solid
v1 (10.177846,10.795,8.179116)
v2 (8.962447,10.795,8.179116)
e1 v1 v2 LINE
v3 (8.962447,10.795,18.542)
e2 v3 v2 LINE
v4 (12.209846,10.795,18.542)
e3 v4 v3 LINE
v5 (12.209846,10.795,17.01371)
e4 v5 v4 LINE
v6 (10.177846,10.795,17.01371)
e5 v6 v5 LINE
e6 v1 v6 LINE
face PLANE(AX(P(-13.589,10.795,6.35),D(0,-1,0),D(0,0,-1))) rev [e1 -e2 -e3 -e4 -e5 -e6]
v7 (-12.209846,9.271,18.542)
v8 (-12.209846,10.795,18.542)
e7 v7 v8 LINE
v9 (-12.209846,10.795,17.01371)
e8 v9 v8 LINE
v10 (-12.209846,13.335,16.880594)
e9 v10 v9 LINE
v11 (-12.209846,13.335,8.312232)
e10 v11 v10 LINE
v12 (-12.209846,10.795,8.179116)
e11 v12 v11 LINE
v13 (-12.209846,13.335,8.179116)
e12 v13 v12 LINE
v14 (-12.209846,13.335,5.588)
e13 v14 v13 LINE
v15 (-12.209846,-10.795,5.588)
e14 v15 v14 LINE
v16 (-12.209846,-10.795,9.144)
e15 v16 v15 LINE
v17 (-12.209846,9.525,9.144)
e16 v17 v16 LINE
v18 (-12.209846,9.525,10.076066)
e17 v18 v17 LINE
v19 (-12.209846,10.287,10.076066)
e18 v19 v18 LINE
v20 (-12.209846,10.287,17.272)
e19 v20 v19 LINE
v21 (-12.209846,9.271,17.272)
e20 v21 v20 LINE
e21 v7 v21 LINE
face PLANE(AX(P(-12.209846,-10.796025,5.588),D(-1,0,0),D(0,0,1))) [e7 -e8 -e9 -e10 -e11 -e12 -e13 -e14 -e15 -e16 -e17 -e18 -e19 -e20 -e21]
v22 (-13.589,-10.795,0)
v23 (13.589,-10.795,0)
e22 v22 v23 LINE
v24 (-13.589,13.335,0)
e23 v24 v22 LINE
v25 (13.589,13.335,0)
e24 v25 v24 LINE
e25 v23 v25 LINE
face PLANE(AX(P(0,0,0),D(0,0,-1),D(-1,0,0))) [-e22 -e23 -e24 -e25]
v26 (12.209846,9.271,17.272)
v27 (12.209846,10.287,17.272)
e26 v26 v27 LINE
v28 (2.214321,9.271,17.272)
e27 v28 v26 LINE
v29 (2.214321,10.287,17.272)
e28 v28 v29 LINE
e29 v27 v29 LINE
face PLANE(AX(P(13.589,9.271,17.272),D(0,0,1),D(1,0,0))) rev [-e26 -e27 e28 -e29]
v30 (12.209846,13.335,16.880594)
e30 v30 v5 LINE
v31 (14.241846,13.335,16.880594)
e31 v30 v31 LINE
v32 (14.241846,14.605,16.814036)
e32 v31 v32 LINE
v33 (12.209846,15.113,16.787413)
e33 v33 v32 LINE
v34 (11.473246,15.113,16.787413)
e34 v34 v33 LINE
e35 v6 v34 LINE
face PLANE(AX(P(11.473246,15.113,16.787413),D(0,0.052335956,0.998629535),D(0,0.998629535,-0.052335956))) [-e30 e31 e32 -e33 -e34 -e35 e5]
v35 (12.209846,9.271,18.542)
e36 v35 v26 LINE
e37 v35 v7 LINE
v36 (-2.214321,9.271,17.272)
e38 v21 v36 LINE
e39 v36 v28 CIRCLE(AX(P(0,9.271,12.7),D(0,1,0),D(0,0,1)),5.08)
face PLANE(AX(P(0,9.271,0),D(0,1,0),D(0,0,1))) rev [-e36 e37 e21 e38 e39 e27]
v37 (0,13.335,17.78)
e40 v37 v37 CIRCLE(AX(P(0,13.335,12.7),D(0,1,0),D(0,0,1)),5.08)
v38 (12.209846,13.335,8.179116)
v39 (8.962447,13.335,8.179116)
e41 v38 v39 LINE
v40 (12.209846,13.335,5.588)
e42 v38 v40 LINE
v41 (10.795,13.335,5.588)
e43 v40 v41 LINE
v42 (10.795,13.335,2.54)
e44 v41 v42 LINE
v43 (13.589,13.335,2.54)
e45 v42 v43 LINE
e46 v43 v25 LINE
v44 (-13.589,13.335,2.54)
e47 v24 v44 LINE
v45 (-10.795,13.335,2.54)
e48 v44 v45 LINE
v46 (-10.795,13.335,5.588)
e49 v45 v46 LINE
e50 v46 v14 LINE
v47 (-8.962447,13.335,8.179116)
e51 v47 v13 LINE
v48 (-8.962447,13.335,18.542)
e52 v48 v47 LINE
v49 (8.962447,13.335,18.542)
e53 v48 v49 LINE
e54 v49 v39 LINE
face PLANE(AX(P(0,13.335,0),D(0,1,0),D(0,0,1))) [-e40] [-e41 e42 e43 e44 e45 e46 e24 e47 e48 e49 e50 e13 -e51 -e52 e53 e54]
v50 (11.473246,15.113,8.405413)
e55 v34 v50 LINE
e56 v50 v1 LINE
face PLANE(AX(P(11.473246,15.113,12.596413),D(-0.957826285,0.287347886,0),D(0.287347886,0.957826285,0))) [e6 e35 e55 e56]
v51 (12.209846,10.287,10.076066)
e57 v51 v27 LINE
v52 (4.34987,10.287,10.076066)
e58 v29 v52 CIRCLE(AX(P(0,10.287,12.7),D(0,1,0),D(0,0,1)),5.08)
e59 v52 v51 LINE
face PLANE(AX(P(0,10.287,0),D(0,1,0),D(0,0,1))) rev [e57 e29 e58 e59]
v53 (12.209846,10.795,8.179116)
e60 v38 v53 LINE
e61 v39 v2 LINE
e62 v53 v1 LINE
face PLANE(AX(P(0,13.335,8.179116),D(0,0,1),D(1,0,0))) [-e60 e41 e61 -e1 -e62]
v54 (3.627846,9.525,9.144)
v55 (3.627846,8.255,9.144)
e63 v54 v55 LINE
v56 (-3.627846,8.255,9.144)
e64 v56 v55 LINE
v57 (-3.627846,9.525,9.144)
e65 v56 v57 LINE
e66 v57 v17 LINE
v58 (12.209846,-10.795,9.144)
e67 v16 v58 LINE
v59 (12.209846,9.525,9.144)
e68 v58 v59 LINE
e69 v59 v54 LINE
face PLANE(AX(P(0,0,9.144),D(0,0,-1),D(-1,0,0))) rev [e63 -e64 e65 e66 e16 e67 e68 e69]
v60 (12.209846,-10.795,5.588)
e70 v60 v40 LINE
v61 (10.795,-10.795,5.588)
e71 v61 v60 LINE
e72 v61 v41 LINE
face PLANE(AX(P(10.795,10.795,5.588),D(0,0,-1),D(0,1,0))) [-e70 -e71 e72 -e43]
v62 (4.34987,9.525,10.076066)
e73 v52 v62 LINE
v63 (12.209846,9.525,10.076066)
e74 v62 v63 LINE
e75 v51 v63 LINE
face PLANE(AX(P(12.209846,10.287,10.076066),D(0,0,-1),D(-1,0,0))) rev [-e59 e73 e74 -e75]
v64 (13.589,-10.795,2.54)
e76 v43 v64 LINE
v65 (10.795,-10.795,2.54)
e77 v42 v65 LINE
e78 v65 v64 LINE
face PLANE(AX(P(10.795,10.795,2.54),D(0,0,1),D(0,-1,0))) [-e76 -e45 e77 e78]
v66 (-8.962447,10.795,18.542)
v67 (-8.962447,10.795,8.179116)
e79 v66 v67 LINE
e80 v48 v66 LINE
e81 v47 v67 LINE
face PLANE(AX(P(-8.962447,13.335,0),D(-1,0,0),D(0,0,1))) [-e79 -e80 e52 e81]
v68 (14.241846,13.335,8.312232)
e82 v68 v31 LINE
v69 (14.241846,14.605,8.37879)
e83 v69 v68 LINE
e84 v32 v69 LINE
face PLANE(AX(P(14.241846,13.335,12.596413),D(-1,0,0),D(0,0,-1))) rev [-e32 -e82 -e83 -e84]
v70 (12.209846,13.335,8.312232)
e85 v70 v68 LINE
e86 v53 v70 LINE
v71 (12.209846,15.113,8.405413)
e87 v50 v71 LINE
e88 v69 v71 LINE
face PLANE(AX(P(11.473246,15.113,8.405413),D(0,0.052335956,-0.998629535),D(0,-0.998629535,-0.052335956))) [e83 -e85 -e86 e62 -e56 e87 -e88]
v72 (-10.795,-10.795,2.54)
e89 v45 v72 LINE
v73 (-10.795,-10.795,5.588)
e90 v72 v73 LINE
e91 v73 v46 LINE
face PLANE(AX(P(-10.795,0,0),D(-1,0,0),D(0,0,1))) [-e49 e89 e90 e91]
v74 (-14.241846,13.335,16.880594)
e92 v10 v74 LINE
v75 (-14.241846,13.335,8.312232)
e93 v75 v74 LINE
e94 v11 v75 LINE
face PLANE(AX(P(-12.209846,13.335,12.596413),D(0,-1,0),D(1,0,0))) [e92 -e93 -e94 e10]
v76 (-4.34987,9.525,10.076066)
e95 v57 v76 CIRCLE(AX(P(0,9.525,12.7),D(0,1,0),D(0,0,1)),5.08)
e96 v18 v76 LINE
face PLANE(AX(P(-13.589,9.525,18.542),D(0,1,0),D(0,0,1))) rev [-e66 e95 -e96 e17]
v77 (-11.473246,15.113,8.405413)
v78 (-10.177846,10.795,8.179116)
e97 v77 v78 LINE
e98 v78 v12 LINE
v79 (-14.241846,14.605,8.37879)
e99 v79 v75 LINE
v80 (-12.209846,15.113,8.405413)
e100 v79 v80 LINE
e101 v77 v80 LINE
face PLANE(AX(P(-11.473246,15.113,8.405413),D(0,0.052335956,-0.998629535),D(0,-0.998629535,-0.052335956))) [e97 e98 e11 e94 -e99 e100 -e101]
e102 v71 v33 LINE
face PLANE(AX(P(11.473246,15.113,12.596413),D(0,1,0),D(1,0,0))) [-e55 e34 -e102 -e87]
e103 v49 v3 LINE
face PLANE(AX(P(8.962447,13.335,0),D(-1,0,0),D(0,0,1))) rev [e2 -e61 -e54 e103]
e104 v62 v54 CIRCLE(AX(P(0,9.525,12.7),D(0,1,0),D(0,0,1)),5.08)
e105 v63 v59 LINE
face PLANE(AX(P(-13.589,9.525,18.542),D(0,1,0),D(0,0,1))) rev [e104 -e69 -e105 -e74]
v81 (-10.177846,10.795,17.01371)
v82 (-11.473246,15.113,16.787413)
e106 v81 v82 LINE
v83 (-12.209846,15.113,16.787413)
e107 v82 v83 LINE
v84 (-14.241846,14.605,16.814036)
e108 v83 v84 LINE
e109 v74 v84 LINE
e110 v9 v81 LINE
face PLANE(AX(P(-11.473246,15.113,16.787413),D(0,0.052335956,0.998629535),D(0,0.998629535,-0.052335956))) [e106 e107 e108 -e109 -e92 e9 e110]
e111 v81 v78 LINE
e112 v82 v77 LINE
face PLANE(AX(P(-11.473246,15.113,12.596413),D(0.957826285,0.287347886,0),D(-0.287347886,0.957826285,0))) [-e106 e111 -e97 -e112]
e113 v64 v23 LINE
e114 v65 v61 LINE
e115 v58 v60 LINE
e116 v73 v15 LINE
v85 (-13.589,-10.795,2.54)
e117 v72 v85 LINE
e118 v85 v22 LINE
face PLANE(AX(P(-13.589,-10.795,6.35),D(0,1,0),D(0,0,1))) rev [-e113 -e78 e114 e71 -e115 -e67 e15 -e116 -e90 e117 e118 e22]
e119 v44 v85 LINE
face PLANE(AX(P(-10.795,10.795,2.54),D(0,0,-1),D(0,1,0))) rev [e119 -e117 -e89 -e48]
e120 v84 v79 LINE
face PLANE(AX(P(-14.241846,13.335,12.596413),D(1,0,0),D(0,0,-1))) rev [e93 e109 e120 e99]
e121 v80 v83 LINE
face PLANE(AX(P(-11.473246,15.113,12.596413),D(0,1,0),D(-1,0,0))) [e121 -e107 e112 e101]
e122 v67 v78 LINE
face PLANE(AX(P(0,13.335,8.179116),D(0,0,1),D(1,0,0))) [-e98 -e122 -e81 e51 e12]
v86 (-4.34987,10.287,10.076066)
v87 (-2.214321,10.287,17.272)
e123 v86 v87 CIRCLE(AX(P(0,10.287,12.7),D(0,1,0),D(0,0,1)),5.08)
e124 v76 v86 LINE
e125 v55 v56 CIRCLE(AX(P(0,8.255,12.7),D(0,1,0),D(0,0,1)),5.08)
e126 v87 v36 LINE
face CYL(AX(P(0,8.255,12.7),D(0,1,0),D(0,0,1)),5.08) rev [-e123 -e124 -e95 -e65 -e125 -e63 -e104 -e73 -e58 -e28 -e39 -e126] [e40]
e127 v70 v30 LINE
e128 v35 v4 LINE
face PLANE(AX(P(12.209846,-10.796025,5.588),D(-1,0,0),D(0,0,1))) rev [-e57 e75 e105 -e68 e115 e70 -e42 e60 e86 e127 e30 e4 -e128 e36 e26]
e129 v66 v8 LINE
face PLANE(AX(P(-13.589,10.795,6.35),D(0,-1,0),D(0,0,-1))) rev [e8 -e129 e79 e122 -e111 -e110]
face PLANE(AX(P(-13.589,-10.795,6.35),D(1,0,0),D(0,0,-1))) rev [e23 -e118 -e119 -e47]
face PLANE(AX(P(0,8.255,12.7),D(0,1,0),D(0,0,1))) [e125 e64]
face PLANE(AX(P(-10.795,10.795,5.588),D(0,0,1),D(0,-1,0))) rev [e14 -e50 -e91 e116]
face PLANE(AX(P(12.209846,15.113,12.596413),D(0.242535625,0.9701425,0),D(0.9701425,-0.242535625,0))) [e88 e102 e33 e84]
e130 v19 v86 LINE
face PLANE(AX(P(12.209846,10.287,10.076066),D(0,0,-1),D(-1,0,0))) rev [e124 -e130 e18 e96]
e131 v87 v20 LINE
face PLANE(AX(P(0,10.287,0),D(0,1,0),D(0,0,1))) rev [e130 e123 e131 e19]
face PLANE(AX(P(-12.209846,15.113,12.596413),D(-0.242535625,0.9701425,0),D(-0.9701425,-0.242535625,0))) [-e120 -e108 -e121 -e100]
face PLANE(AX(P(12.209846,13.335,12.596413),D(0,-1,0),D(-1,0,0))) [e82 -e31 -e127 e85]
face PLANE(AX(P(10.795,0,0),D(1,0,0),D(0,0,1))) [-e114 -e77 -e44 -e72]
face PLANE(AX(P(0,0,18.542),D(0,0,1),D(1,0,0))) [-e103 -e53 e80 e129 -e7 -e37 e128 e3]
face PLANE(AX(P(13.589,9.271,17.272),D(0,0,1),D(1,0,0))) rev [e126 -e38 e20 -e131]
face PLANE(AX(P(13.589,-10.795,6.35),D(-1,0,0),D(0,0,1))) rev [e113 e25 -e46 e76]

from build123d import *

# Parameters (mm, degrees)
SKETCH2_W                       = 27.178
SKETCH2_H                       = 21.59
INITIAL_EXTRUDE_DEPTH           = 6.35
SKETCH3_W                       = 27.178
SKETCH3_H                       = 1.27
INTIAL_EXTRUDE_HORIZONTAL_DEPTH = 12.192
SKETCH4_W                       = 27.178
SKETCH4_H                       = 1.27
SLIGHT_EXTRUDE_VERTICAL_DEPTH   = 0.254
SKETCH5_W                       = 3.048
SKETCH5_H                       = 21.59
CUT_EXTRUDE1_DEPTH              = 2.794
CUT_EXTRUDE2_REACH              = 33.537
SKETCH6_W                       = 1.379153921
SKETCH6_H                       = 12.954
SNAP_START                      = 11.473246079
SNAP_HOOK2_DEPTH                = 0.7366
SNAP_START_2                    = 8.31223189
SNAP_HOOK2_2_DEPTH              = 8.568362063
SNAP_START_3                    = 8.179116131
SNAP_HOOK2_3_DEPTH              = 8.834593581
SNAP_START_4                    = 9
SNAP_HOOK2_4_DEPTH              = 6
BOSS_EXTRUDE1_DEPTH             = 2.54
SKETCH8_W                       = 24.419692158
SKETCH8_H                       = 7.195933706
CUT_EXTRUDE3_DEPTH              = 0.762
SKETCH9_W                       = 24.419692158
SKETCH9_H                       = 20.32
BOSS_EXTRUDE2_DEPTH             = 2.794
SKETCH10_R                      = 5.08
CUT_EXTRUDE4_DEPTH              = 5.08


with BuildPart() as part:
    # Sketch2 → Initial Extrude (new body)
    with BuildSketch(Plane.XY):
        Rectangle(SKETCH2_W, SKETCH2_H)
    extrude(amount=INITIAL_EXTRUDE_DEPTH)

    # Sketch3 → Intial Extrude horizontal (add)
    with BuildSketch(Plane.XY.offset(6.35)):
        with Locations((0, 10.16)):
            Rectangle(SKETCH3_W, SKETCH3_H)
    extrude(amount=INTIAL_EXTRUDE_HORIZONTAL_DEPTH)

    # Sketch4 → Slight Extrude vertical (add)
    with BuildSketch(Plane.XZ.offset(-9.525)):
        with Locations((0, 17.907)):
            Rectangle(SKETCH4_W, SKETCH4_H)
    extrude(amount=SLIGHT_EXTRUDE_VERTICAL_DEPTH)

    # Sketch5 → Cut-Extrude1 (cut)
    with BuildSketch(Plane.ZY.offset(13.589)):
        with Locations((4.064, 0)):
            Rectangle(SKETCH5_W, SKETCH5_H)
    cut_extrude1 = extrude(amount=-CUT_EXTRUDE1_DEPTH, mode=Mode.SUBTRACT)

    # Mirror3: Cut-Extrude1 across plane
    add(cut_extrude1.mirror(Plane(origin=(0, 0, 0), x_dir=(0, 0, 1), z_dir=(1, 0, 0))), mode=Mode.SUBTRACT)

    # Sketch6 → Cut-Extrude2 (cut, up to next)
    with BuildSketch(Plane(origin=(0, 10.795, 0), x_dir=(1, 0, 0), z_dir=(0, 1, 0)), mode=Mode.PRIVATE) as cut_extrude2_sk1:
        with Locations((12.89942304, -12.065)):
            Rectangle(SKETCH6_W, SKETCH6_H)
    cut_extrude2_tool1 = extrude(cut_extrude2_sk1.sketch, amount=-CUT_EXTRUDE2_REACH, mode=Mode.PRIVATE) & part.part
    cut_extrude2 = cut_extrude2_tool1.solids().sort_by_distance((12.899423, 10.795, 12.065))[0]
    add(cut_extrude2, mode=Mode.SUBTRACT)

    # Mirror7: Cut-Extrude2 across plane
    add(cut_extrude2.mirror(Plane(origin=(0, 0, 0), x_dir=(0, 0, 1), z_dir=(1, 0, 0))), mode=Mode.SUBTRACT)

    # Snap Hook2: read off the stored shape, not the designer's step
    # Snap Hook2 outline → Snap Hook2 (add)
    with BuildSketch(Plane.YZ.offset(SNAP_START)):
        Polygon((10.795, 17.013709712), (10.795, 8.179116131), (15.113, 8.405412922), (15.113, 16.787412922), align=None)
    snap_hook2 = extrude(amount=SNAP_HOOK2_DEPTH)

    # Snap Hook2 2 outline → Snap Hook2 2 (add)
    with BuildSketch(Plane.XY.offset(SNAP_START_2)):
        Polygon((11.473246079, 10.795), (11.473246079, 15.113), (10.177846079, 10.795), align=None)
        Polygon((12.209846079, 15.113), (12.209846079, 13.335), (14.241846079, 13.335), (14.241846079, 14.605), align=None)
    snap_hook2_2 = extrude(amount=SNAP_HOOK2_2_DEPTH)

    # Snap Hook2 3 outline → Snap Hook2 3 (add)
    with BuildSketch(Plane.XY.offset(SNAP_START_3)):
        Polygon((11.473246079, 10.795), (11.473246079, 15.113), (10.177846079, 10.795), align=None)
    snap_hook2_3 = extrude(amount=SNAP_HOOK2_3_DEPTH)

    # Snap Hook2 4 outline → Snap Hook2 4 (cut)
    with BuildSketch(Plane.YZ.offset(SNAP_START_4)):
        Polygon((10.795, 8.179116131), (17, 8.179116131), (17, 8.504306402), (15.113, 8.405412922), align=None)
        Polygon((15.113, 16.787412922), (17, 16.688519443), (17, 17.013709712), (10.795, 17.013709712), align=None)
    snap_hook2_4 = extrude(amount=SNAP_HOOK2_4_DEPTH, mode=Mode.SUBTRACT)

    # Mirror6: Snap Hook2, Snap Hook2 2, Snap Hook2 3, Snap Hook2 4 across plane
    add(snap_hook2.mirror(Plane(origin=(0, 0, 0), x_dir=(0, 0, 1), z_dir=(1, 0, 0))))
    add(snap_hook2_2.mirror(Plane(origin=(0, 0, 0), x_dir=(0, 0, 1), z_dir=(1, 0, 0))))
    add(snap_hook2_3.mirror(Plane(origin=(0, 0, 0), x_dir=(0, 0, 1), z_dir=(1, 0, 0))))
    add(snap_hook2_4.mirror(Plane(origin=(0, 0, 0), x_dir=(0, 0, 1), z_dir=(1, 0, 0))), mode=Mode.SUBTRACT)

    # Sketch7 → Boss-Extrude1 (add)
    with BuildSketch(Plane(origin=(0, 10.795, 0), x_dir=(1, 0, 0), z_dir=(0, 1, 0))):
        Polygon((-8.962447439, -8.179116131), (-8.962447439, -18.542), (8.962447439, -18.542), (8.962447439, -8.179116131), (9, -8.179116131), (10.177846079, -8.179116131), (12.209846079, -8.179116131), (12.209846079, -5.588), (10.795, -5.588), (10.795, -2.54), (13.589, -2.54), (13.589, 0), (-13.589, 0), (-13.589, -2.54), (-10.795, -2.54), (-10.795, -5.588), (-12.209846079, -5.588), (-12.209846079, -8.179116131), (-10.177846079, -8.179116131), (-9, -8.179116131), align=None)
    extrude(amount=BOSS_EXTRUDE1_DEPTH)

    # Sketch8 → Cut-Extrude3 (cut)
    with BuildSketch(Plane.XZ.offset(-9.525)):
        with Locations((0, 13.674033147)):
            Rectangle(SKETCH8_W, SKETCH8_H)
    extrude(amount=-CUT_EXTRUDE3_DEPTH, mode=Mode.SUBTRACT)

    # Sketch9 → Boss-Extrude2 (add)
    with BuildSketch(Plane.XY.offset(6.35)):
        with Locations((0, -0.635)):
            Rectangle(SKETCH9_W, SKETCH9_H)
    extrude(amount=BOSS_EXTRUDE2_DEPTH)

    # Sketch10 → Cut-Extrude4 (cut)
    with BuildSketch(Plane(origin=(0, 13.335, 0), x_dir=(1, 0, 0), z_dir=(0, 1, 0))):
        with Locations(Location((0, -12.7, 0), (0, 0, 270))):
            Circle(SKETCH10_R)
    extrude(amount=-CUT_EXTRUDE4_DEPTH, mode=Mode.SUBTRACT)


solid = part.part
